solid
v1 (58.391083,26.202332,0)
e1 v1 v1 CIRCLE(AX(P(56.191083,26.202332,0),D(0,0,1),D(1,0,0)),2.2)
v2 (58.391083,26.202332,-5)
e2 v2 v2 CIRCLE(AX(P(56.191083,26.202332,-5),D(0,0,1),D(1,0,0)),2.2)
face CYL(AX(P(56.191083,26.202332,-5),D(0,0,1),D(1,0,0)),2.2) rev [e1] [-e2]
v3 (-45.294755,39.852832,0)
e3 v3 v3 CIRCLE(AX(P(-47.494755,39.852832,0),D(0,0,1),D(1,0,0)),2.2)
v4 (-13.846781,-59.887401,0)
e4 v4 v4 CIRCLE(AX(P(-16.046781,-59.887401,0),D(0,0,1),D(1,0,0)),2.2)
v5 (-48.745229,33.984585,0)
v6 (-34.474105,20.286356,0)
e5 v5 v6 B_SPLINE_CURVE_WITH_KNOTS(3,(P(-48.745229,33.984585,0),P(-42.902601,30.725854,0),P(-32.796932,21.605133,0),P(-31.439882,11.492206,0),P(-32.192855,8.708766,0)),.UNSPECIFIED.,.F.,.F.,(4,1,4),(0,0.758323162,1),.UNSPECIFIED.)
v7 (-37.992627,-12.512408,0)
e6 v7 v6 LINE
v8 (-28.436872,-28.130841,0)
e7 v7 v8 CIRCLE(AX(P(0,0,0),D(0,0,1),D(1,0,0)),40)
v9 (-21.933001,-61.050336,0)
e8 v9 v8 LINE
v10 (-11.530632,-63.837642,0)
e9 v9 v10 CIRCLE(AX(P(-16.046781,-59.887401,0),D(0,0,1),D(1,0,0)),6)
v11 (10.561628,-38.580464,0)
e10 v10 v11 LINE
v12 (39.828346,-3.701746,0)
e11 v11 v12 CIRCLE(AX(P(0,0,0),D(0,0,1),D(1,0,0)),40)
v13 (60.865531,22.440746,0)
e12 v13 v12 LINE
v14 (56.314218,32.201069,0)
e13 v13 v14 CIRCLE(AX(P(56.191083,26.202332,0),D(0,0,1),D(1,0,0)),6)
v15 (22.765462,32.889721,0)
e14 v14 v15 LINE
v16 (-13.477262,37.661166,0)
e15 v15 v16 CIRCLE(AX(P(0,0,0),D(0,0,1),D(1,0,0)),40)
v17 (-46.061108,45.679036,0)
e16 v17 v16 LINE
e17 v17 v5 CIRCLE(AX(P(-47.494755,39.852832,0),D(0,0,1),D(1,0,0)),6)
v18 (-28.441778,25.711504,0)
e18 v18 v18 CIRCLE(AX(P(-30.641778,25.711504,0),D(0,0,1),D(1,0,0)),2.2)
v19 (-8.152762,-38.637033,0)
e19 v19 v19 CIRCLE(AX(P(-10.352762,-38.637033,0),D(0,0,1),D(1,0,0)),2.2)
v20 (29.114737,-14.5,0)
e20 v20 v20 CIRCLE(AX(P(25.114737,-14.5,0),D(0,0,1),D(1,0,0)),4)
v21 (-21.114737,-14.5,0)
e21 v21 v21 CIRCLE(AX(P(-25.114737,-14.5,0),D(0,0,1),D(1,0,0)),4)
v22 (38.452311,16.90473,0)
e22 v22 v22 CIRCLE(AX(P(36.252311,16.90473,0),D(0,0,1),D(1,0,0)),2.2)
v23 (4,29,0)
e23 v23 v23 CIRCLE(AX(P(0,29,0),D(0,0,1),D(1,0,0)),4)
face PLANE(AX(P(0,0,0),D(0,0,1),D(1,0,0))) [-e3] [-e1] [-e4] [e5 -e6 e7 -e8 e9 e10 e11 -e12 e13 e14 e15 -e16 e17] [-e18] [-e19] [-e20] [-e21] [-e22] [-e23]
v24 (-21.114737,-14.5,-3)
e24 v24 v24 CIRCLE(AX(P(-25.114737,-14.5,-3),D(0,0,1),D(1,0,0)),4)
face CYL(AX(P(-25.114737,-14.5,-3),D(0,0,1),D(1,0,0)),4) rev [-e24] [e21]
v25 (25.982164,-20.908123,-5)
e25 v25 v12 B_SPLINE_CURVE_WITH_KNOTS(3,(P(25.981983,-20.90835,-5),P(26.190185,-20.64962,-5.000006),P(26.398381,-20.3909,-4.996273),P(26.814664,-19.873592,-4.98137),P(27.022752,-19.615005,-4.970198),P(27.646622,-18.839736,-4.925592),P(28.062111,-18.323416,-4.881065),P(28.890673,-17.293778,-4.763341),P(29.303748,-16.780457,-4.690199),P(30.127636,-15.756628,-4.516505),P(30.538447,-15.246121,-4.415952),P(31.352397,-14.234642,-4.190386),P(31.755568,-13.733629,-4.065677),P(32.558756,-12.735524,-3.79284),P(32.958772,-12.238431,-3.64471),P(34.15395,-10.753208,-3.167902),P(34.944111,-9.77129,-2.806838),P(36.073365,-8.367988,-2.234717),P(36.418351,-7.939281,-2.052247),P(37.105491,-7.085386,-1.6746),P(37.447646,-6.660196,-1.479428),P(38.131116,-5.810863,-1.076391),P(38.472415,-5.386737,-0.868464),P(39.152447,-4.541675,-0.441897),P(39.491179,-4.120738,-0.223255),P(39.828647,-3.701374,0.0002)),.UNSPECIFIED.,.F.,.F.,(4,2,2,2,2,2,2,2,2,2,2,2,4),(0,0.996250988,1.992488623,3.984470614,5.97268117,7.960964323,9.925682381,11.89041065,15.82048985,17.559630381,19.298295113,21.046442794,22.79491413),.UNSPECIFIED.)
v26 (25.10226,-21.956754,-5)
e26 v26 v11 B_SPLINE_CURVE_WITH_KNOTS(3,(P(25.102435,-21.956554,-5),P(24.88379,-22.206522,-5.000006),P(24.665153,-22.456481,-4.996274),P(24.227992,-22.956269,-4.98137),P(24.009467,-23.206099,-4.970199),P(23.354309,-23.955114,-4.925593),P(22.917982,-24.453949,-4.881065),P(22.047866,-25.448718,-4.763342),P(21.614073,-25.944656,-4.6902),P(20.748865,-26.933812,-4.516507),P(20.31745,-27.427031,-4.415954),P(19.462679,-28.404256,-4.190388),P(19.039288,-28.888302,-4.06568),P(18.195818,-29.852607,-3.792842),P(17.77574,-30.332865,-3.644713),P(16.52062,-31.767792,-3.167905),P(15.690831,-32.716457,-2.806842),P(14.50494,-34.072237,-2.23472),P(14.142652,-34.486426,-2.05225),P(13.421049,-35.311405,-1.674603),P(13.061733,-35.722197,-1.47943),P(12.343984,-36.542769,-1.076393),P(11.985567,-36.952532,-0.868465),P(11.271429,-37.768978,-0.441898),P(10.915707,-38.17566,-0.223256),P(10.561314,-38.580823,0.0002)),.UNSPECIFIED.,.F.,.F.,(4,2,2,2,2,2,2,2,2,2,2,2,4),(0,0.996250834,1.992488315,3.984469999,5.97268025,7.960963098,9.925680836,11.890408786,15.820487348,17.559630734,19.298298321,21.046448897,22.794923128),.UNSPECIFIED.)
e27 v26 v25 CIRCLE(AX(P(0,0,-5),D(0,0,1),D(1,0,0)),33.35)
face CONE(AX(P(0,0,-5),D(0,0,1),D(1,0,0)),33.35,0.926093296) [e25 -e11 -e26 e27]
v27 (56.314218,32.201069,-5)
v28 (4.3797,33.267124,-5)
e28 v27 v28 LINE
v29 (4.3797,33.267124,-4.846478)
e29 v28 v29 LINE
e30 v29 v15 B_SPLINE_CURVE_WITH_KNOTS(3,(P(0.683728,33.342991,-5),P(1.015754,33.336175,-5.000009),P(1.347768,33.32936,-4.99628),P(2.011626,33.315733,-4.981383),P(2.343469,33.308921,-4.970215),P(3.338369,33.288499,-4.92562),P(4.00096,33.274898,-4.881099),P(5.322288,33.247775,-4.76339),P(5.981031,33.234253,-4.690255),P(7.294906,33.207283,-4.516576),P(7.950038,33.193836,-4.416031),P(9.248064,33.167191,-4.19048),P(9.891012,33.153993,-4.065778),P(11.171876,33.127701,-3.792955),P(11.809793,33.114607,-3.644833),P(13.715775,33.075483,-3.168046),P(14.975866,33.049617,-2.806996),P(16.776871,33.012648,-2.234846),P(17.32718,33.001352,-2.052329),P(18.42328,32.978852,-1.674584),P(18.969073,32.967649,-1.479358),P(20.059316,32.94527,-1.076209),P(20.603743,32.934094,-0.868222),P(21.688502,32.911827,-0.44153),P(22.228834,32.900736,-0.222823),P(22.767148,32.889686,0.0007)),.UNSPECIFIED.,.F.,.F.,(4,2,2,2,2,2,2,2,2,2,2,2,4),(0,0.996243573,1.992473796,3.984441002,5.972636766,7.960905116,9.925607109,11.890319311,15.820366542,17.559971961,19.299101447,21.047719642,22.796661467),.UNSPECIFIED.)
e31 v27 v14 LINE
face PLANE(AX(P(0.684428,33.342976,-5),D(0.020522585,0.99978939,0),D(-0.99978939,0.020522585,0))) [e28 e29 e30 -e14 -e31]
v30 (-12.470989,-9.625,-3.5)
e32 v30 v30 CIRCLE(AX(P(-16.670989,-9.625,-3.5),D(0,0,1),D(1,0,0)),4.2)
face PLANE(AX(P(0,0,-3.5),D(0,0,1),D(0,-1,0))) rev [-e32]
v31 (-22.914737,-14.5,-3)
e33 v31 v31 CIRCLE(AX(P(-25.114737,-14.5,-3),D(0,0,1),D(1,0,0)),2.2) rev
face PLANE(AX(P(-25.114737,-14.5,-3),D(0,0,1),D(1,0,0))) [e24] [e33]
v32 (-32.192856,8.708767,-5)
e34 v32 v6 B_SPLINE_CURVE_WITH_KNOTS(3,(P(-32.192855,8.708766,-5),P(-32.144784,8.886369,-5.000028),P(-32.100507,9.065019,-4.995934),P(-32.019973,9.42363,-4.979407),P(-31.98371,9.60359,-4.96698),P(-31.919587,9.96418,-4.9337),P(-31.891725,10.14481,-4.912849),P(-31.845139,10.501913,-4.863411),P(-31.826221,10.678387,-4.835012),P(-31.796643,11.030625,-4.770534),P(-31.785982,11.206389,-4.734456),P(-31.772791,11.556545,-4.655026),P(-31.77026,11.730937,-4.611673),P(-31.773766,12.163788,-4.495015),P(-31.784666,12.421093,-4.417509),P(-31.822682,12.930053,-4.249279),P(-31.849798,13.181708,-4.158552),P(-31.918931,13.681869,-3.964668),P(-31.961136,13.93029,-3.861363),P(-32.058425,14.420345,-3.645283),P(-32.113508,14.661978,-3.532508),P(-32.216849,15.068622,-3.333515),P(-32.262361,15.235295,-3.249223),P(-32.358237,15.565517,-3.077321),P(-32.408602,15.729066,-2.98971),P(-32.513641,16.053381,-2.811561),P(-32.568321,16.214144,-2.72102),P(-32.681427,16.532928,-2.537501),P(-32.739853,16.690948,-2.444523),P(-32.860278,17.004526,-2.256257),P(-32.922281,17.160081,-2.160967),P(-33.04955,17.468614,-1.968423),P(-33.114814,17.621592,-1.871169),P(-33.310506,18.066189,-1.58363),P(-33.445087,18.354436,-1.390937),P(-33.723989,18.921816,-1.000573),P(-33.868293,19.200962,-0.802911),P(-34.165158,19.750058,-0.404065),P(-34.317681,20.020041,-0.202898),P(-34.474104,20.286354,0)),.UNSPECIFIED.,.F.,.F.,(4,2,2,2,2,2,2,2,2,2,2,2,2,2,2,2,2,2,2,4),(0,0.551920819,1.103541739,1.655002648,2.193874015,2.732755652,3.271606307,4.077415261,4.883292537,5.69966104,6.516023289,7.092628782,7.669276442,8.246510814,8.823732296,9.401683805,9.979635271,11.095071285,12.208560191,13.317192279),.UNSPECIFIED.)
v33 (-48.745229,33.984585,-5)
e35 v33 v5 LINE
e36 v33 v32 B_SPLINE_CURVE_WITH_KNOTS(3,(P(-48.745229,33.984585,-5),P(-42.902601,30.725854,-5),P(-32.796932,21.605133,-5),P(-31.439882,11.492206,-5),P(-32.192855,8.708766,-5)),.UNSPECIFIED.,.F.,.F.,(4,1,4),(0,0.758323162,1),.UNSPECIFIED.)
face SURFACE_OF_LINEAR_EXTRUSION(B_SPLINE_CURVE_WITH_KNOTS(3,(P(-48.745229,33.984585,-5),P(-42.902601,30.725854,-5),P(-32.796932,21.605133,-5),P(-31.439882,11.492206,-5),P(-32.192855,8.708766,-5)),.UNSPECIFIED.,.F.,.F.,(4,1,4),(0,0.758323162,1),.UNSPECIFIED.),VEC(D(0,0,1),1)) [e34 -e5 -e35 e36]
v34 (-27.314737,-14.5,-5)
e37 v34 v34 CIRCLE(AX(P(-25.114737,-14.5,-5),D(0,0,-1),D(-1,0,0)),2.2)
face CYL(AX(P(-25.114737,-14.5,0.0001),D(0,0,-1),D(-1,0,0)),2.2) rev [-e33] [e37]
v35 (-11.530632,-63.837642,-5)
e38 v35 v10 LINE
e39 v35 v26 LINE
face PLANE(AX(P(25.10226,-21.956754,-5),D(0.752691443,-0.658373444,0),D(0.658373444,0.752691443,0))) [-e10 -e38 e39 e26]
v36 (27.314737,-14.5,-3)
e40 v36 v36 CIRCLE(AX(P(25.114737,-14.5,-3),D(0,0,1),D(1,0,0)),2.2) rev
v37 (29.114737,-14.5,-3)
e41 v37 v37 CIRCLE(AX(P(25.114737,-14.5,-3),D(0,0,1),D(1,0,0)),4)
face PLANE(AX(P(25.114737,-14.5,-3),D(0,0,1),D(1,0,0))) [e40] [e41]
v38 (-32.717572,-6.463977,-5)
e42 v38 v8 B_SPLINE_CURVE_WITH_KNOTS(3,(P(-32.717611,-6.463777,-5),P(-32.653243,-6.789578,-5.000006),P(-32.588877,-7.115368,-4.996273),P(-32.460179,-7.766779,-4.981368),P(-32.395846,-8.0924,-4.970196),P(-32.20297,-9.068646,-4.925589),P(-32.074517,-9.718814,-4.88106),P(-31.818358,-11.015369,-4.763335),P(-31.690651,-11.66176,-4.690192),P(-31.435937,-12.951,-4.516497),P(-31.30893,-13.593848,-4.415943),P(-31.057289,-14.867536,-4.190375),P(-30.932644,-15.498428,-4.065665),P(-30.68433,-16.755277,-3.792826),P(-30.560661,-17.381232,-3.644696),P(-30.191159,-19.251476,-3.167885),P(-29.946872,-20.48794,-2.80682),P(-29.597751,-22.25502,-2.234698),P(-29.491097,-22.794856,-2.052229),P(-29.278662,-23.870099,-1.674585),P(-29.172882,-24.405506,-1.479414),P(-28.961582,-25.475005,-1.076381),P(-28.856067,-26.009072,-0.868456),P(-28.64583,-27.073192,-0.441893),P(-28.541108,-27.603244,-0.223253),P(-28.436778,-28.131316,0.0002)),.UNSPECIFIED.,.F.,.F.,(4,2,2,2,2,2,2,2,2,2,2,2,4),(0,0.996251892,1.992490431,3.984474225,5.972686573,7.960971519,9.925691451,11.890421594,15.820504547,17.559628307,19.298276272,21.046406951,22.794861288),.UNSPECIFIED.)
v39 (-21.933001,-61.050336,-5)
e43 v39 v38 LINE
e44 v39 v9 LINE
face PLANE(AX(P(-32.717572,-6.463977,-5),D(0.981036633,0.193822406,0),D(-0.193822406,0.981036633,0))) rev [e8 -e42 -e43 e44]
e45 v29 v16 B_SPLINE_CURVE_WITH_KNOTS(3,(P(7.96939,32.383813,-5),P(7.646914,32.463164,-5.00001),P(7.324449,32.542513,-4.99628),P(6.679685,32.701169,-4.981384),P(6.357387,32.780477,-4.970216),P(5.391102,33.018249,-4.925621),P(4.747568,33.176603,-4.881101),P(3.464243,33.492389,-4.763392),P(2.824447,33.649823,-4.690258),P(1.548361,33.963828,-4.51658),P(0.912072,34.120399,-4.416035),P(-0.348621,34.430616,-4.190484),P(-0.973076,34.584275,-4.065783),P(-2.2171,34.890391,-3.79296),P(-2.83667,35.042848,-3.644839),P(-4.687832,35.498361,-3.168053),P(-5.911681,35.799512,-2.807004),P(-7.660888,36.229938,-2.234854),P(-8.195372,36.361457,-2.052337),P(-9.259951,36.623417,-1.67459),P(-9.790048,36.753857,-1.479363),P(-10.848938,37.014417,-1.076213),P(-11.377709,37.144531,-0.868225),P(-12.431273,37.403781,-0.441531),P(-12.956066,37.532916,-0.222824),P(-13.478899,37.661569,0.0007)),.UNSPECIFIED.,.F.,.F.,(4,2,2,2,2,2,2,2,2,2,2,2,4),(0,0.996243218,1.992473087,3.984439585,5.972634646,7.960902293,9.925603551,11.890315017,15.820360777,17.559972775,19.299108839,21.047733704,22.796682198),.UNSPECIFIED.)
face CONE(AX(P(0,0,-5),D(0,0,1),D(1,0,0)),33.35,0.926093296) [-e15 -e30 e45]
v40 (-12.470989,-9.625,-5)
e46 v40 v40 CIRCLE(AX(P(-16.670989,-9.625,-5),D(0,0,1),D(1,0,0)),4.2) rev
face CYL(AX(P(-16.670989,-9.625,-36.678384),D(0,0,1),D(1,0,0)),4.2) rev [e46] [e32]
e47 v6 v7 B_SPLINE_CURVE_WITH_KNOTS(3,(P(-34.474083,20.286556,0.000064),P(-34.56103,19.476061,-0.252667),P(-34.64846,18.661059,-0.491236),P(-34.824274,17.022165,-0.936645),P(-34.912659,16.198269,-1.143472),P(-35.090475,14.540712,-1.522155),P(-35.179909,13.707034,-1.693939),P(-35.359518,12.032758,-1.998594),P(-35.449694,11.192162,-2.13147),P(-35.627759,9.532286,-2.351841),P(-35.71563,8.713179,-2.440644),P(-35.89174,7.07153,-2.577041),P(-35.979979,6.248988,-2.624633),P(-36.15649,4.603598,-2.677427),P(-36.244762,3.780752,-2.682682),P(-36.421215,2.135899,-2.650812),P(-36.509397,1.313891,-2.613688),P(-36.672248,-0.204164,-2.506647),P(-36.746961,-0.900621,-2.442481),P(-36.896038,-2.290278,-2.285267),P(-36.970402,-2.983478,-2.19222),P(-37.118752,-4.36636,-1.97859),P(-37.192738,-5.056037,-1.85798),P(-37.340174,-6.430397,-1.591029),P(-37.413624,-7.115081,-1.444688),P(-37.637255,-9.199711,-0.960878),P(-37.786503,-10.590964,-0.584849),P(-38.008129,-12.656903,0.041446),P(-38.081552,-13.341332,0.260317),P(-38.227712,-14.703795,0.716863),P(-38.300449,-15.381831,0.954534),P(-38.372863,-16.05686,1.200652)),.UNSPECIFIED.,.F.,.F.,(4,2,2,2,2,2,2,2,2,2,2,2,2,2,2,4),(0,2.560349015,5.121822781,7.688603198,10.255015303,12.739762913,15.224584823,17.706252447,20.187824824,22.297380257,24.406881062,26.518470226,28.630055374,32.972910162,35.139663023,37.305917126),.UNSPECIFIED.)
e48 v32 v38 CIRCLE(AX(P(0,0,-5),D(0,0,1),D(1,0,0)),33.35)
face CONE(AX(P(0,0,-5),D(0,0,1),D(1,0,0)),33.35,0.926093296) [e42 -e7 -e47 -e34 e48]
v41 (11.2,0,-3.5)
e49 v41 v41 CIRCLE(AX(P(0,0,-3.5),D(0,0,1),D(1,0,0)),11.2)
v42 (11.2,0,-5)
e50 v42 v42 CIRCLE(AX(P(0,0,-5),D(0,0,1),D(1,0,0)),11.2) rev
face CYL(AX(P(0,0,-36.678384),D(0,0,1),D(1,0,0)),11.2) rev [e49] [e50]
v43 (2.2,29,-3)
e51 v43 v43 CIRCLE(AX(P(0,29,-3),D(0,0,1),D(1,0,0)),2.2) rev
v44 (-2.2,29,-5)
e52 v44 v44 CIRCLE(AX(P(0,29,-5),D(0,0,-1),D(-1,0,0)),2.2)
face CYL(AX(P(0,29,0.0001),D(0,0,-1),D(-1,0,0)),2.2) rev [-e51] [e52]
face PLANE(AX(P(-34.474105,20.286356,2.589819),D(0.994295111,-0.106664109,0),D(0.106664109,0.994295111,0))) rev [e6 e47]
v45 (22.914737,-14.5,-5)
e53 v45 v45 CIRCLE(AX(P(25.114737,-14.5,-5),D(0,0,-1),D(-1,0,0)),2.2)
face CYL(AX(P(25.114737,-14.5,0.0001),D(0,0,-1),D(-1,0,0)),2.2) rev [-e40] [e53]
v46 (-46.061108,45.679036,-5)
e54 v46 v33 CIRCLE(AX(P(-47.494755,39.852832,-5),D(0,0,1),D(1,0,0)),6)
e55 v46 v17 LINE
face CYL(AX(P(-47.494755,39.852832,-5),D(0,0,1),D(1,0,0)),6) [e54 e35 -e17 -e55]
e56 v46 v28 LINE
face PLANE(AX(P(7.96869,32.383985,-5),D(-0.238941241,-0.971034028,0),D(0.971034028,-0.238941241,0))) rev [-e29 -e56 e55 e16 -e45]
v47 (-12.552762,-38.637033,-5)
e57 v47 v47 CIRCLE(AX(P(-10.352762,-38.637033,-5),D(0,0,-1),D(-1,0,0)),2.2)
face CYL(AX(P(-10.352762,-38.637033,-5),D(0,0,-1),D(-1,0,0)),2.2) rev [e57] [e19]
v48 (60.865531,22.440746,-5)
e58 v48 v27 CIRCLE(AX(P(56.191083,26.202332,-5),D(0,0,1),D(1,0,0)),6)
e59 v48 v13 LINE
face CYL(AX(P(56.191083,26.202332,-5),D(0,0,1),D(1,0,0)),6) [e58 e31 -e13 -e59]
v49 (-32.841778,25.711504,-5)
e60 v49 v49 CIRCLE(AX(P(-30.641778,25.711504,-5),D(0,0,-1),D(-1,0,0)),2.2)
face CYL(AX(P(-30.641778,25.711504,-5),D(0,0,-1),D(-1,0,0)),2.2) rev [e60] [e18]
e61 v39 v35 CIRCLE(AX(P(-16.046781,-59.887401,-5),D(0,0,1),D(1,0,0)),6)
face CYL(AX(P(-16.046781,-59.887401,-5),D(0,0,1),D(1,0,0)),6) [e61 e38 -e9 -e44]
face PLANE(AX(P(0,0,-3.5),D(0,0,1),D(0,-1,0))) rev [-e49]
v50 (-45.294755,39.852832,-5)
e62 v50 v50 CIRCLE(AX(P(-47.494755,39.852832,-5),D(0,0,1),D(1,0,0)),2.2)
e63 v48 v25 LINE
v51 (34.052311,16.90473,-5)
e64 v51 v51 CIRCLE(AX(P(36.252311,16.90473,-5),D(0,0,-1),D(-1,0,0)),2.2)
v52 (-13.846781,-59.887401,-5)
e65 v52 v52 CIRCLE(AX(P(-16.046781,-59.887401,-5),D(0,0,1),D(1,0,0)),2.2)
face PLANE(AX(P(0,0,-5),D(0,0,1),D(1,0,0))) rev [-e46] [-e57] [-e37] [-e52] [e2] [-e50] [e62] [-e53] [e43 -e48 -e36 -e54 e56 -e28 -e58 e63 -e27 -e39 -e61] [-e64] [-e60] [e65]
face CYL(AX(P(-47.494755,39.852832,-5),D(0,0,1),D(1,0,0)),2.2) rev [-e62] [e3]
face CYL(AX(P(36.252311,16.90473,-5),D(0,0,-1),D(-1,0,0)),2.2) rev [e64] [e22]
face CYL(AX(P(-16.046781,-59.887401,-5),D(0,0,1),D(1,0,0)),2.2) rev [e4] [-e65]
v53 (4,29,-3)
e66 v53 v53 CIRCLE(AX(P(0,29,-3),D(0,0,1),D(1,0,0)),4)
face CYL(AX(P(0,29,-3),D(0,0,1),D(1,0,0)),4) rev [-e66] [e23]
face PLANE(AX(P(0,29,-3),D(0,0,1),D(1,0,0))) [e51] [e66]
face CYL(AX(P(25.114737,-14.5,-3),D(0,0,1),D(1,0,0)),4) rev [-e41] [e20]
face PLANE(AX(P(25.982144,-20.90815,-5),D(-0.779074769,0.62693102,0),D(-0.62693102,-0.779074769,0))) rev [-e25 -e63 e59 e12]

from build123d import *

# Parameters (mm, degrees)
SKETCH_1_R               = 40
SKETCH_2_R               = 33.35
SKETCH_3_R               = 2.2
CUT_EXTRUDE_1_DEPTH      = 57.789083608
SKETCH_4_R               = 4
CUT_EXTRUDE_2_DEPTH      = 3
OTHER_START              = -5
OTHER_1_OUTLINE_R        = 4
OTHER_1_OUTLINE_R_2      = 2.9
OTHER_1_OUTLINE_R_3      = 11
OTHER_1_OUTLINE_R_4      = 9
OTHER_1_DEPTH            = 1.5
CUT_EXTRUDE_START        = 27
SKETCH_5_R               = 11.2
SKETCH_5_R_2             = 4.2
CUT_EXTRUDE_3_DEPTH      = 1.5
SKETCH_7_R               = 2.2
EXTRUDE_1_DEPTH          = 5
HOLE_WIZARD_4_4_4_4_1_D  = 4.4
CUT_EXTRUDE_4_DEPTH      = 91.740732016
CUT_EXTRUDE_4_DEPTH_BACK = 91.740732016


# Read off the part's stored shape, not the designer's step: 型腔1
with BuildPart() as part:
    # 草图1 → 放样2 section 0
    with BuildSketch(Plane.XY):
        Circle(SKETCH_1_R)
    # 草图2 → 放样2 section 1
    with BuildSketch(Plane.XY.offset(-5)):
        Circle(SKETCH_2_R)
    loft()

    # 草图3 → 切除-拉伸1 (cut, through all)
    with BuildSketch(Plane(origin=(0, 0, -5), x_dir=(-1, 0, 0), z_dir=(0, 0, -1))):
        with Locations((-25.11473671, -14.5)):
            Circle(SKETCH_3_R)
        with Locations((25.11473671, -14.5)):
            Circle(SKETCH_3_R)
        with Locations((0, 29)):
            Circle(SKETCH_3_R)
    extrude(amount=-CUT_EXTRUDE_1_DEPTH, mode=Mode.SUBTRACT)

    # 草图4 → 切除-拉伸2 (cut)
    with BuildSketch(Plane.XY):
        with Locations((0, 29)):
            Circle(SKETCH_4_R)
        with Locations((25.11473671, -14.5)):
            Circle(SKETCH_4_R)
        with Locations((-25.11473671, -14.5)):
            Circle(SKETCH_4_R)
    extrude(amount=-CUT_EXTRUDE_2_DEPTH, mode=Mode.SUBTRACT)

    # 型腔1 outline → 型腔1 (cut)
    # profile 1 of 2: a face of its own
    with BuildSketch(Plane.XY.offset(OTHER_START)):
        with Locations((-16.670989023, -9.625)):
            Circle(OTHER_1_OUTLINE_R)
        with Locations((-16.670989023, -9.625)):
            Circle(OTHER_1_OUTLINE_R_2, mode=Mode.SUBTRACT)
    # profile 2 of 2: a face of its own
    with BuildSketch(Plane.XY.offset(OTHER_START)):
        Circle(OTHER_1_OUTLINE_R_3)
        Circle(OTHER_1_OUTLINE_R_4, mode=Mode.SUBTRACT)
    extrude(amount=OTHER_1_DEPTH, mode=Mode.SUBTRACT)

    # 草图5 → 切除-拉伸3 (cut)
    with BuildSketch(Plane(origin=(52.090644265, -18.098750786, 23.5), x_dir=(0.9659258262890773, -0.2588190451024873, 0), z_dir=(0, 0, -1)).offset(CUT_EXTRUDE_START)):
        with Locations(Location((-55, -4, 0), (0, 0, 345))):
            Circle(SKETCH_5_R)
        with Locations(Location((-68.611805538, 9.611805538, 0), (0, 0, 345))):
            Circle(SKETCH_5_R_2)
    extrude(amount=CUT_EXTRUDE_3_DEPTH, mode=Mode.SUBTRACT)

    # 草图7 → 凸台-拉伸1 (add)
    # profile 1 of 5: a face of its own
    with BuildSketch(Plane.XY):
        with BuildLine():
            Line((56.314218304, 32.201068565), (22.765462134, 32.889720793))
            ThreePointArc((22.765462134, 32.889720793), (35.43034353, 18.565849222), (40, 0))
            ThreePointArc((40, 0), (39.957063165, -1.852863527), (39.828344838, -3.701749249))
            Line((39.828344838, -3.701749249), (60.865531412, 22.440746108))
            ThreePointArc((60.865531412, 22.440746108), (61.628929518, 28.738041798), (56.314218304, 32.201068565))
        make_face()
        with Locations((56.191082796, 26.202332228)):
            Circle(SKETCH_7_R, mode=Mode.SUBTRACT)
    # profile 2 of 5: a face of its own
    with BuildSketch(Plane.XY):
        with BuildLine():
            Line((-13.477261693, 37.661165904), (-46.06110803, 45.679035969))
            ThreePointArc((-46.06110803, 45.679035969), (-53.34269802, 41.195056807), (-48.745228802, 33.984585346))
            add(Edge.make_bspline(
                [(-48.745228802, 33.984585346), (-43.952768946, 31.311585993), (-37.935277565, 26.17758836), (-34.474104128, 20.286353653)],
                knots=[0, 0, 0, 0, 0.622020345, 0.622020345, 0.622020345, 0.622020345], degree=3))
            ThreePointArc((-34.474104128, 20.286353653), (-25.50106657, 30.81713166), (-13.477261693, 37.661165904))
        make_face()
        with Locations((-47.494755473, 39.852831801)):
            Circle(SKETCH_7_R, mode=Mode.SUBTRACT)
    # profile 3 of 5: a face of its own
    with BuildSketch(Plane.XY):
        with BuildLine():
            Line((4.379699915, 33.26712364), (-13.477261693, 37.661165904))
            ThreePointArc((-13.477261693, 37.661165904), (-25.50106657, 30.81713166), (-34.474104128, 20.286353653))
            add(Edge.make_bspline(
                [(-34.474104128, 20.286353653), (-33.715659981, 18.995412138), (-31.952819591, 15.314686764), (-31.439882273, 11.492206468), (-32.192854649, 8.708766247)],
                knots=[0.622020345, 0.622020345, 0.622020345, 0.622020345, 0.758323162, 1, 1, 1, 1], degree=3))
            ThreePointArc((-32.192854649, 8.708766247), (4.392652812, 33.059447988), (33.35, 0))
            ThreePointArc((33.35, 0), (31.454149072, -11.084178191), (25.982143558, -20.908149515))
            Line((25.982143558, -20.908149515), (39.828344838, -3.701749249))
            ThreePointArc((39.828344838, -3.701749249), (39.957063165, -1.852863527), (40, 0))
            ThreePointArc((40, 0), (35.43034353, 18.565849222), (22.765462134, 32.889720793))
            Line((22.765462134, 32.889720793), (4.379699915, 33.26712364))
        make_face()
    # profile 4 of 5: a face of its own
    with BuildSketch(Plane.XY):
        with BuildLine():
            ThreePointArc((10.561630861, -38.580460774), (-10.352761804, -38.637033052), (-28.436871018, -28.13084369))
            Line((-28.436871018, -28.13084369), (-21.933000593, -61.050335666))
            ThreePointArc((-21.933000593, -61.050335666), (-17.599695067, -65.682956188), (-11.530632138, -63.837641893))
            Line((-11.530632138, -63.837641893), (10.561630861, -38.580460774))
        make_face()
        with Locations((-16.046780796, -59.88740123)):
            Circle(SKETCH_7_R, mode=Mode.SUBTRACT)
    # profile 5 of 5: a face of its own
    with BuildSketch(Plane.XY):
        with BuildLine():
            Line((-32.717571704, -6.463977243), (-28.436871018, -28.13084369))
            ThreePointArc((-28.436871018, -28.13084369), (-10.352761804, -38.637033052), (10.561630861, -38.580460774))
            Line((10.561630861, -38.580460774), (25.102259624, -21.956754354))
            ThreePointArc((25.102259624, -21.956754354), (-8.631615154, -32.213626307), (-32.717571704, -6.463977243))
        make_face()
    extrude(amount=-EXTRUDE_1_DEPTH)

    # Ø4.4 (4.4) 直径孔1 (through all)
    with Locations(Plane(origin=(0, 0, -5), x_dir=(-1, 0, 0), z_dir=(0, 0, -1))):
        with Locations((10.352761804, -38.637033052), (-36.252311481, 16.90473047), (30.641777725, 25.711504387)):
            Hole(HOLE_WIZARD_4_4_4_4_1_D / 2)

    # 草图10 → 切除-拉伸4 (cut, two sides: drawn at the far end of the back side and taken through both)
    with BuildSketch(Plane(origin=(0, 0, -5), x_dir=(-1, 0, 0), z_dir=(0, 0, -1)).offset(-CUT_EXTRUDE_4_DEPTH_BACK)):
        Polygon((34.47410458, 20.28635588), (38.372841801, -16.056659606), (62.683016438, 23.101645648), align=None)
    extrude(amount=CUT_EXTRUDE_4_DEPTH + CUT_EXTRUDE_4_DEPTH_BACK, mode=Mode.SUBTRACT)


solid = part.part
